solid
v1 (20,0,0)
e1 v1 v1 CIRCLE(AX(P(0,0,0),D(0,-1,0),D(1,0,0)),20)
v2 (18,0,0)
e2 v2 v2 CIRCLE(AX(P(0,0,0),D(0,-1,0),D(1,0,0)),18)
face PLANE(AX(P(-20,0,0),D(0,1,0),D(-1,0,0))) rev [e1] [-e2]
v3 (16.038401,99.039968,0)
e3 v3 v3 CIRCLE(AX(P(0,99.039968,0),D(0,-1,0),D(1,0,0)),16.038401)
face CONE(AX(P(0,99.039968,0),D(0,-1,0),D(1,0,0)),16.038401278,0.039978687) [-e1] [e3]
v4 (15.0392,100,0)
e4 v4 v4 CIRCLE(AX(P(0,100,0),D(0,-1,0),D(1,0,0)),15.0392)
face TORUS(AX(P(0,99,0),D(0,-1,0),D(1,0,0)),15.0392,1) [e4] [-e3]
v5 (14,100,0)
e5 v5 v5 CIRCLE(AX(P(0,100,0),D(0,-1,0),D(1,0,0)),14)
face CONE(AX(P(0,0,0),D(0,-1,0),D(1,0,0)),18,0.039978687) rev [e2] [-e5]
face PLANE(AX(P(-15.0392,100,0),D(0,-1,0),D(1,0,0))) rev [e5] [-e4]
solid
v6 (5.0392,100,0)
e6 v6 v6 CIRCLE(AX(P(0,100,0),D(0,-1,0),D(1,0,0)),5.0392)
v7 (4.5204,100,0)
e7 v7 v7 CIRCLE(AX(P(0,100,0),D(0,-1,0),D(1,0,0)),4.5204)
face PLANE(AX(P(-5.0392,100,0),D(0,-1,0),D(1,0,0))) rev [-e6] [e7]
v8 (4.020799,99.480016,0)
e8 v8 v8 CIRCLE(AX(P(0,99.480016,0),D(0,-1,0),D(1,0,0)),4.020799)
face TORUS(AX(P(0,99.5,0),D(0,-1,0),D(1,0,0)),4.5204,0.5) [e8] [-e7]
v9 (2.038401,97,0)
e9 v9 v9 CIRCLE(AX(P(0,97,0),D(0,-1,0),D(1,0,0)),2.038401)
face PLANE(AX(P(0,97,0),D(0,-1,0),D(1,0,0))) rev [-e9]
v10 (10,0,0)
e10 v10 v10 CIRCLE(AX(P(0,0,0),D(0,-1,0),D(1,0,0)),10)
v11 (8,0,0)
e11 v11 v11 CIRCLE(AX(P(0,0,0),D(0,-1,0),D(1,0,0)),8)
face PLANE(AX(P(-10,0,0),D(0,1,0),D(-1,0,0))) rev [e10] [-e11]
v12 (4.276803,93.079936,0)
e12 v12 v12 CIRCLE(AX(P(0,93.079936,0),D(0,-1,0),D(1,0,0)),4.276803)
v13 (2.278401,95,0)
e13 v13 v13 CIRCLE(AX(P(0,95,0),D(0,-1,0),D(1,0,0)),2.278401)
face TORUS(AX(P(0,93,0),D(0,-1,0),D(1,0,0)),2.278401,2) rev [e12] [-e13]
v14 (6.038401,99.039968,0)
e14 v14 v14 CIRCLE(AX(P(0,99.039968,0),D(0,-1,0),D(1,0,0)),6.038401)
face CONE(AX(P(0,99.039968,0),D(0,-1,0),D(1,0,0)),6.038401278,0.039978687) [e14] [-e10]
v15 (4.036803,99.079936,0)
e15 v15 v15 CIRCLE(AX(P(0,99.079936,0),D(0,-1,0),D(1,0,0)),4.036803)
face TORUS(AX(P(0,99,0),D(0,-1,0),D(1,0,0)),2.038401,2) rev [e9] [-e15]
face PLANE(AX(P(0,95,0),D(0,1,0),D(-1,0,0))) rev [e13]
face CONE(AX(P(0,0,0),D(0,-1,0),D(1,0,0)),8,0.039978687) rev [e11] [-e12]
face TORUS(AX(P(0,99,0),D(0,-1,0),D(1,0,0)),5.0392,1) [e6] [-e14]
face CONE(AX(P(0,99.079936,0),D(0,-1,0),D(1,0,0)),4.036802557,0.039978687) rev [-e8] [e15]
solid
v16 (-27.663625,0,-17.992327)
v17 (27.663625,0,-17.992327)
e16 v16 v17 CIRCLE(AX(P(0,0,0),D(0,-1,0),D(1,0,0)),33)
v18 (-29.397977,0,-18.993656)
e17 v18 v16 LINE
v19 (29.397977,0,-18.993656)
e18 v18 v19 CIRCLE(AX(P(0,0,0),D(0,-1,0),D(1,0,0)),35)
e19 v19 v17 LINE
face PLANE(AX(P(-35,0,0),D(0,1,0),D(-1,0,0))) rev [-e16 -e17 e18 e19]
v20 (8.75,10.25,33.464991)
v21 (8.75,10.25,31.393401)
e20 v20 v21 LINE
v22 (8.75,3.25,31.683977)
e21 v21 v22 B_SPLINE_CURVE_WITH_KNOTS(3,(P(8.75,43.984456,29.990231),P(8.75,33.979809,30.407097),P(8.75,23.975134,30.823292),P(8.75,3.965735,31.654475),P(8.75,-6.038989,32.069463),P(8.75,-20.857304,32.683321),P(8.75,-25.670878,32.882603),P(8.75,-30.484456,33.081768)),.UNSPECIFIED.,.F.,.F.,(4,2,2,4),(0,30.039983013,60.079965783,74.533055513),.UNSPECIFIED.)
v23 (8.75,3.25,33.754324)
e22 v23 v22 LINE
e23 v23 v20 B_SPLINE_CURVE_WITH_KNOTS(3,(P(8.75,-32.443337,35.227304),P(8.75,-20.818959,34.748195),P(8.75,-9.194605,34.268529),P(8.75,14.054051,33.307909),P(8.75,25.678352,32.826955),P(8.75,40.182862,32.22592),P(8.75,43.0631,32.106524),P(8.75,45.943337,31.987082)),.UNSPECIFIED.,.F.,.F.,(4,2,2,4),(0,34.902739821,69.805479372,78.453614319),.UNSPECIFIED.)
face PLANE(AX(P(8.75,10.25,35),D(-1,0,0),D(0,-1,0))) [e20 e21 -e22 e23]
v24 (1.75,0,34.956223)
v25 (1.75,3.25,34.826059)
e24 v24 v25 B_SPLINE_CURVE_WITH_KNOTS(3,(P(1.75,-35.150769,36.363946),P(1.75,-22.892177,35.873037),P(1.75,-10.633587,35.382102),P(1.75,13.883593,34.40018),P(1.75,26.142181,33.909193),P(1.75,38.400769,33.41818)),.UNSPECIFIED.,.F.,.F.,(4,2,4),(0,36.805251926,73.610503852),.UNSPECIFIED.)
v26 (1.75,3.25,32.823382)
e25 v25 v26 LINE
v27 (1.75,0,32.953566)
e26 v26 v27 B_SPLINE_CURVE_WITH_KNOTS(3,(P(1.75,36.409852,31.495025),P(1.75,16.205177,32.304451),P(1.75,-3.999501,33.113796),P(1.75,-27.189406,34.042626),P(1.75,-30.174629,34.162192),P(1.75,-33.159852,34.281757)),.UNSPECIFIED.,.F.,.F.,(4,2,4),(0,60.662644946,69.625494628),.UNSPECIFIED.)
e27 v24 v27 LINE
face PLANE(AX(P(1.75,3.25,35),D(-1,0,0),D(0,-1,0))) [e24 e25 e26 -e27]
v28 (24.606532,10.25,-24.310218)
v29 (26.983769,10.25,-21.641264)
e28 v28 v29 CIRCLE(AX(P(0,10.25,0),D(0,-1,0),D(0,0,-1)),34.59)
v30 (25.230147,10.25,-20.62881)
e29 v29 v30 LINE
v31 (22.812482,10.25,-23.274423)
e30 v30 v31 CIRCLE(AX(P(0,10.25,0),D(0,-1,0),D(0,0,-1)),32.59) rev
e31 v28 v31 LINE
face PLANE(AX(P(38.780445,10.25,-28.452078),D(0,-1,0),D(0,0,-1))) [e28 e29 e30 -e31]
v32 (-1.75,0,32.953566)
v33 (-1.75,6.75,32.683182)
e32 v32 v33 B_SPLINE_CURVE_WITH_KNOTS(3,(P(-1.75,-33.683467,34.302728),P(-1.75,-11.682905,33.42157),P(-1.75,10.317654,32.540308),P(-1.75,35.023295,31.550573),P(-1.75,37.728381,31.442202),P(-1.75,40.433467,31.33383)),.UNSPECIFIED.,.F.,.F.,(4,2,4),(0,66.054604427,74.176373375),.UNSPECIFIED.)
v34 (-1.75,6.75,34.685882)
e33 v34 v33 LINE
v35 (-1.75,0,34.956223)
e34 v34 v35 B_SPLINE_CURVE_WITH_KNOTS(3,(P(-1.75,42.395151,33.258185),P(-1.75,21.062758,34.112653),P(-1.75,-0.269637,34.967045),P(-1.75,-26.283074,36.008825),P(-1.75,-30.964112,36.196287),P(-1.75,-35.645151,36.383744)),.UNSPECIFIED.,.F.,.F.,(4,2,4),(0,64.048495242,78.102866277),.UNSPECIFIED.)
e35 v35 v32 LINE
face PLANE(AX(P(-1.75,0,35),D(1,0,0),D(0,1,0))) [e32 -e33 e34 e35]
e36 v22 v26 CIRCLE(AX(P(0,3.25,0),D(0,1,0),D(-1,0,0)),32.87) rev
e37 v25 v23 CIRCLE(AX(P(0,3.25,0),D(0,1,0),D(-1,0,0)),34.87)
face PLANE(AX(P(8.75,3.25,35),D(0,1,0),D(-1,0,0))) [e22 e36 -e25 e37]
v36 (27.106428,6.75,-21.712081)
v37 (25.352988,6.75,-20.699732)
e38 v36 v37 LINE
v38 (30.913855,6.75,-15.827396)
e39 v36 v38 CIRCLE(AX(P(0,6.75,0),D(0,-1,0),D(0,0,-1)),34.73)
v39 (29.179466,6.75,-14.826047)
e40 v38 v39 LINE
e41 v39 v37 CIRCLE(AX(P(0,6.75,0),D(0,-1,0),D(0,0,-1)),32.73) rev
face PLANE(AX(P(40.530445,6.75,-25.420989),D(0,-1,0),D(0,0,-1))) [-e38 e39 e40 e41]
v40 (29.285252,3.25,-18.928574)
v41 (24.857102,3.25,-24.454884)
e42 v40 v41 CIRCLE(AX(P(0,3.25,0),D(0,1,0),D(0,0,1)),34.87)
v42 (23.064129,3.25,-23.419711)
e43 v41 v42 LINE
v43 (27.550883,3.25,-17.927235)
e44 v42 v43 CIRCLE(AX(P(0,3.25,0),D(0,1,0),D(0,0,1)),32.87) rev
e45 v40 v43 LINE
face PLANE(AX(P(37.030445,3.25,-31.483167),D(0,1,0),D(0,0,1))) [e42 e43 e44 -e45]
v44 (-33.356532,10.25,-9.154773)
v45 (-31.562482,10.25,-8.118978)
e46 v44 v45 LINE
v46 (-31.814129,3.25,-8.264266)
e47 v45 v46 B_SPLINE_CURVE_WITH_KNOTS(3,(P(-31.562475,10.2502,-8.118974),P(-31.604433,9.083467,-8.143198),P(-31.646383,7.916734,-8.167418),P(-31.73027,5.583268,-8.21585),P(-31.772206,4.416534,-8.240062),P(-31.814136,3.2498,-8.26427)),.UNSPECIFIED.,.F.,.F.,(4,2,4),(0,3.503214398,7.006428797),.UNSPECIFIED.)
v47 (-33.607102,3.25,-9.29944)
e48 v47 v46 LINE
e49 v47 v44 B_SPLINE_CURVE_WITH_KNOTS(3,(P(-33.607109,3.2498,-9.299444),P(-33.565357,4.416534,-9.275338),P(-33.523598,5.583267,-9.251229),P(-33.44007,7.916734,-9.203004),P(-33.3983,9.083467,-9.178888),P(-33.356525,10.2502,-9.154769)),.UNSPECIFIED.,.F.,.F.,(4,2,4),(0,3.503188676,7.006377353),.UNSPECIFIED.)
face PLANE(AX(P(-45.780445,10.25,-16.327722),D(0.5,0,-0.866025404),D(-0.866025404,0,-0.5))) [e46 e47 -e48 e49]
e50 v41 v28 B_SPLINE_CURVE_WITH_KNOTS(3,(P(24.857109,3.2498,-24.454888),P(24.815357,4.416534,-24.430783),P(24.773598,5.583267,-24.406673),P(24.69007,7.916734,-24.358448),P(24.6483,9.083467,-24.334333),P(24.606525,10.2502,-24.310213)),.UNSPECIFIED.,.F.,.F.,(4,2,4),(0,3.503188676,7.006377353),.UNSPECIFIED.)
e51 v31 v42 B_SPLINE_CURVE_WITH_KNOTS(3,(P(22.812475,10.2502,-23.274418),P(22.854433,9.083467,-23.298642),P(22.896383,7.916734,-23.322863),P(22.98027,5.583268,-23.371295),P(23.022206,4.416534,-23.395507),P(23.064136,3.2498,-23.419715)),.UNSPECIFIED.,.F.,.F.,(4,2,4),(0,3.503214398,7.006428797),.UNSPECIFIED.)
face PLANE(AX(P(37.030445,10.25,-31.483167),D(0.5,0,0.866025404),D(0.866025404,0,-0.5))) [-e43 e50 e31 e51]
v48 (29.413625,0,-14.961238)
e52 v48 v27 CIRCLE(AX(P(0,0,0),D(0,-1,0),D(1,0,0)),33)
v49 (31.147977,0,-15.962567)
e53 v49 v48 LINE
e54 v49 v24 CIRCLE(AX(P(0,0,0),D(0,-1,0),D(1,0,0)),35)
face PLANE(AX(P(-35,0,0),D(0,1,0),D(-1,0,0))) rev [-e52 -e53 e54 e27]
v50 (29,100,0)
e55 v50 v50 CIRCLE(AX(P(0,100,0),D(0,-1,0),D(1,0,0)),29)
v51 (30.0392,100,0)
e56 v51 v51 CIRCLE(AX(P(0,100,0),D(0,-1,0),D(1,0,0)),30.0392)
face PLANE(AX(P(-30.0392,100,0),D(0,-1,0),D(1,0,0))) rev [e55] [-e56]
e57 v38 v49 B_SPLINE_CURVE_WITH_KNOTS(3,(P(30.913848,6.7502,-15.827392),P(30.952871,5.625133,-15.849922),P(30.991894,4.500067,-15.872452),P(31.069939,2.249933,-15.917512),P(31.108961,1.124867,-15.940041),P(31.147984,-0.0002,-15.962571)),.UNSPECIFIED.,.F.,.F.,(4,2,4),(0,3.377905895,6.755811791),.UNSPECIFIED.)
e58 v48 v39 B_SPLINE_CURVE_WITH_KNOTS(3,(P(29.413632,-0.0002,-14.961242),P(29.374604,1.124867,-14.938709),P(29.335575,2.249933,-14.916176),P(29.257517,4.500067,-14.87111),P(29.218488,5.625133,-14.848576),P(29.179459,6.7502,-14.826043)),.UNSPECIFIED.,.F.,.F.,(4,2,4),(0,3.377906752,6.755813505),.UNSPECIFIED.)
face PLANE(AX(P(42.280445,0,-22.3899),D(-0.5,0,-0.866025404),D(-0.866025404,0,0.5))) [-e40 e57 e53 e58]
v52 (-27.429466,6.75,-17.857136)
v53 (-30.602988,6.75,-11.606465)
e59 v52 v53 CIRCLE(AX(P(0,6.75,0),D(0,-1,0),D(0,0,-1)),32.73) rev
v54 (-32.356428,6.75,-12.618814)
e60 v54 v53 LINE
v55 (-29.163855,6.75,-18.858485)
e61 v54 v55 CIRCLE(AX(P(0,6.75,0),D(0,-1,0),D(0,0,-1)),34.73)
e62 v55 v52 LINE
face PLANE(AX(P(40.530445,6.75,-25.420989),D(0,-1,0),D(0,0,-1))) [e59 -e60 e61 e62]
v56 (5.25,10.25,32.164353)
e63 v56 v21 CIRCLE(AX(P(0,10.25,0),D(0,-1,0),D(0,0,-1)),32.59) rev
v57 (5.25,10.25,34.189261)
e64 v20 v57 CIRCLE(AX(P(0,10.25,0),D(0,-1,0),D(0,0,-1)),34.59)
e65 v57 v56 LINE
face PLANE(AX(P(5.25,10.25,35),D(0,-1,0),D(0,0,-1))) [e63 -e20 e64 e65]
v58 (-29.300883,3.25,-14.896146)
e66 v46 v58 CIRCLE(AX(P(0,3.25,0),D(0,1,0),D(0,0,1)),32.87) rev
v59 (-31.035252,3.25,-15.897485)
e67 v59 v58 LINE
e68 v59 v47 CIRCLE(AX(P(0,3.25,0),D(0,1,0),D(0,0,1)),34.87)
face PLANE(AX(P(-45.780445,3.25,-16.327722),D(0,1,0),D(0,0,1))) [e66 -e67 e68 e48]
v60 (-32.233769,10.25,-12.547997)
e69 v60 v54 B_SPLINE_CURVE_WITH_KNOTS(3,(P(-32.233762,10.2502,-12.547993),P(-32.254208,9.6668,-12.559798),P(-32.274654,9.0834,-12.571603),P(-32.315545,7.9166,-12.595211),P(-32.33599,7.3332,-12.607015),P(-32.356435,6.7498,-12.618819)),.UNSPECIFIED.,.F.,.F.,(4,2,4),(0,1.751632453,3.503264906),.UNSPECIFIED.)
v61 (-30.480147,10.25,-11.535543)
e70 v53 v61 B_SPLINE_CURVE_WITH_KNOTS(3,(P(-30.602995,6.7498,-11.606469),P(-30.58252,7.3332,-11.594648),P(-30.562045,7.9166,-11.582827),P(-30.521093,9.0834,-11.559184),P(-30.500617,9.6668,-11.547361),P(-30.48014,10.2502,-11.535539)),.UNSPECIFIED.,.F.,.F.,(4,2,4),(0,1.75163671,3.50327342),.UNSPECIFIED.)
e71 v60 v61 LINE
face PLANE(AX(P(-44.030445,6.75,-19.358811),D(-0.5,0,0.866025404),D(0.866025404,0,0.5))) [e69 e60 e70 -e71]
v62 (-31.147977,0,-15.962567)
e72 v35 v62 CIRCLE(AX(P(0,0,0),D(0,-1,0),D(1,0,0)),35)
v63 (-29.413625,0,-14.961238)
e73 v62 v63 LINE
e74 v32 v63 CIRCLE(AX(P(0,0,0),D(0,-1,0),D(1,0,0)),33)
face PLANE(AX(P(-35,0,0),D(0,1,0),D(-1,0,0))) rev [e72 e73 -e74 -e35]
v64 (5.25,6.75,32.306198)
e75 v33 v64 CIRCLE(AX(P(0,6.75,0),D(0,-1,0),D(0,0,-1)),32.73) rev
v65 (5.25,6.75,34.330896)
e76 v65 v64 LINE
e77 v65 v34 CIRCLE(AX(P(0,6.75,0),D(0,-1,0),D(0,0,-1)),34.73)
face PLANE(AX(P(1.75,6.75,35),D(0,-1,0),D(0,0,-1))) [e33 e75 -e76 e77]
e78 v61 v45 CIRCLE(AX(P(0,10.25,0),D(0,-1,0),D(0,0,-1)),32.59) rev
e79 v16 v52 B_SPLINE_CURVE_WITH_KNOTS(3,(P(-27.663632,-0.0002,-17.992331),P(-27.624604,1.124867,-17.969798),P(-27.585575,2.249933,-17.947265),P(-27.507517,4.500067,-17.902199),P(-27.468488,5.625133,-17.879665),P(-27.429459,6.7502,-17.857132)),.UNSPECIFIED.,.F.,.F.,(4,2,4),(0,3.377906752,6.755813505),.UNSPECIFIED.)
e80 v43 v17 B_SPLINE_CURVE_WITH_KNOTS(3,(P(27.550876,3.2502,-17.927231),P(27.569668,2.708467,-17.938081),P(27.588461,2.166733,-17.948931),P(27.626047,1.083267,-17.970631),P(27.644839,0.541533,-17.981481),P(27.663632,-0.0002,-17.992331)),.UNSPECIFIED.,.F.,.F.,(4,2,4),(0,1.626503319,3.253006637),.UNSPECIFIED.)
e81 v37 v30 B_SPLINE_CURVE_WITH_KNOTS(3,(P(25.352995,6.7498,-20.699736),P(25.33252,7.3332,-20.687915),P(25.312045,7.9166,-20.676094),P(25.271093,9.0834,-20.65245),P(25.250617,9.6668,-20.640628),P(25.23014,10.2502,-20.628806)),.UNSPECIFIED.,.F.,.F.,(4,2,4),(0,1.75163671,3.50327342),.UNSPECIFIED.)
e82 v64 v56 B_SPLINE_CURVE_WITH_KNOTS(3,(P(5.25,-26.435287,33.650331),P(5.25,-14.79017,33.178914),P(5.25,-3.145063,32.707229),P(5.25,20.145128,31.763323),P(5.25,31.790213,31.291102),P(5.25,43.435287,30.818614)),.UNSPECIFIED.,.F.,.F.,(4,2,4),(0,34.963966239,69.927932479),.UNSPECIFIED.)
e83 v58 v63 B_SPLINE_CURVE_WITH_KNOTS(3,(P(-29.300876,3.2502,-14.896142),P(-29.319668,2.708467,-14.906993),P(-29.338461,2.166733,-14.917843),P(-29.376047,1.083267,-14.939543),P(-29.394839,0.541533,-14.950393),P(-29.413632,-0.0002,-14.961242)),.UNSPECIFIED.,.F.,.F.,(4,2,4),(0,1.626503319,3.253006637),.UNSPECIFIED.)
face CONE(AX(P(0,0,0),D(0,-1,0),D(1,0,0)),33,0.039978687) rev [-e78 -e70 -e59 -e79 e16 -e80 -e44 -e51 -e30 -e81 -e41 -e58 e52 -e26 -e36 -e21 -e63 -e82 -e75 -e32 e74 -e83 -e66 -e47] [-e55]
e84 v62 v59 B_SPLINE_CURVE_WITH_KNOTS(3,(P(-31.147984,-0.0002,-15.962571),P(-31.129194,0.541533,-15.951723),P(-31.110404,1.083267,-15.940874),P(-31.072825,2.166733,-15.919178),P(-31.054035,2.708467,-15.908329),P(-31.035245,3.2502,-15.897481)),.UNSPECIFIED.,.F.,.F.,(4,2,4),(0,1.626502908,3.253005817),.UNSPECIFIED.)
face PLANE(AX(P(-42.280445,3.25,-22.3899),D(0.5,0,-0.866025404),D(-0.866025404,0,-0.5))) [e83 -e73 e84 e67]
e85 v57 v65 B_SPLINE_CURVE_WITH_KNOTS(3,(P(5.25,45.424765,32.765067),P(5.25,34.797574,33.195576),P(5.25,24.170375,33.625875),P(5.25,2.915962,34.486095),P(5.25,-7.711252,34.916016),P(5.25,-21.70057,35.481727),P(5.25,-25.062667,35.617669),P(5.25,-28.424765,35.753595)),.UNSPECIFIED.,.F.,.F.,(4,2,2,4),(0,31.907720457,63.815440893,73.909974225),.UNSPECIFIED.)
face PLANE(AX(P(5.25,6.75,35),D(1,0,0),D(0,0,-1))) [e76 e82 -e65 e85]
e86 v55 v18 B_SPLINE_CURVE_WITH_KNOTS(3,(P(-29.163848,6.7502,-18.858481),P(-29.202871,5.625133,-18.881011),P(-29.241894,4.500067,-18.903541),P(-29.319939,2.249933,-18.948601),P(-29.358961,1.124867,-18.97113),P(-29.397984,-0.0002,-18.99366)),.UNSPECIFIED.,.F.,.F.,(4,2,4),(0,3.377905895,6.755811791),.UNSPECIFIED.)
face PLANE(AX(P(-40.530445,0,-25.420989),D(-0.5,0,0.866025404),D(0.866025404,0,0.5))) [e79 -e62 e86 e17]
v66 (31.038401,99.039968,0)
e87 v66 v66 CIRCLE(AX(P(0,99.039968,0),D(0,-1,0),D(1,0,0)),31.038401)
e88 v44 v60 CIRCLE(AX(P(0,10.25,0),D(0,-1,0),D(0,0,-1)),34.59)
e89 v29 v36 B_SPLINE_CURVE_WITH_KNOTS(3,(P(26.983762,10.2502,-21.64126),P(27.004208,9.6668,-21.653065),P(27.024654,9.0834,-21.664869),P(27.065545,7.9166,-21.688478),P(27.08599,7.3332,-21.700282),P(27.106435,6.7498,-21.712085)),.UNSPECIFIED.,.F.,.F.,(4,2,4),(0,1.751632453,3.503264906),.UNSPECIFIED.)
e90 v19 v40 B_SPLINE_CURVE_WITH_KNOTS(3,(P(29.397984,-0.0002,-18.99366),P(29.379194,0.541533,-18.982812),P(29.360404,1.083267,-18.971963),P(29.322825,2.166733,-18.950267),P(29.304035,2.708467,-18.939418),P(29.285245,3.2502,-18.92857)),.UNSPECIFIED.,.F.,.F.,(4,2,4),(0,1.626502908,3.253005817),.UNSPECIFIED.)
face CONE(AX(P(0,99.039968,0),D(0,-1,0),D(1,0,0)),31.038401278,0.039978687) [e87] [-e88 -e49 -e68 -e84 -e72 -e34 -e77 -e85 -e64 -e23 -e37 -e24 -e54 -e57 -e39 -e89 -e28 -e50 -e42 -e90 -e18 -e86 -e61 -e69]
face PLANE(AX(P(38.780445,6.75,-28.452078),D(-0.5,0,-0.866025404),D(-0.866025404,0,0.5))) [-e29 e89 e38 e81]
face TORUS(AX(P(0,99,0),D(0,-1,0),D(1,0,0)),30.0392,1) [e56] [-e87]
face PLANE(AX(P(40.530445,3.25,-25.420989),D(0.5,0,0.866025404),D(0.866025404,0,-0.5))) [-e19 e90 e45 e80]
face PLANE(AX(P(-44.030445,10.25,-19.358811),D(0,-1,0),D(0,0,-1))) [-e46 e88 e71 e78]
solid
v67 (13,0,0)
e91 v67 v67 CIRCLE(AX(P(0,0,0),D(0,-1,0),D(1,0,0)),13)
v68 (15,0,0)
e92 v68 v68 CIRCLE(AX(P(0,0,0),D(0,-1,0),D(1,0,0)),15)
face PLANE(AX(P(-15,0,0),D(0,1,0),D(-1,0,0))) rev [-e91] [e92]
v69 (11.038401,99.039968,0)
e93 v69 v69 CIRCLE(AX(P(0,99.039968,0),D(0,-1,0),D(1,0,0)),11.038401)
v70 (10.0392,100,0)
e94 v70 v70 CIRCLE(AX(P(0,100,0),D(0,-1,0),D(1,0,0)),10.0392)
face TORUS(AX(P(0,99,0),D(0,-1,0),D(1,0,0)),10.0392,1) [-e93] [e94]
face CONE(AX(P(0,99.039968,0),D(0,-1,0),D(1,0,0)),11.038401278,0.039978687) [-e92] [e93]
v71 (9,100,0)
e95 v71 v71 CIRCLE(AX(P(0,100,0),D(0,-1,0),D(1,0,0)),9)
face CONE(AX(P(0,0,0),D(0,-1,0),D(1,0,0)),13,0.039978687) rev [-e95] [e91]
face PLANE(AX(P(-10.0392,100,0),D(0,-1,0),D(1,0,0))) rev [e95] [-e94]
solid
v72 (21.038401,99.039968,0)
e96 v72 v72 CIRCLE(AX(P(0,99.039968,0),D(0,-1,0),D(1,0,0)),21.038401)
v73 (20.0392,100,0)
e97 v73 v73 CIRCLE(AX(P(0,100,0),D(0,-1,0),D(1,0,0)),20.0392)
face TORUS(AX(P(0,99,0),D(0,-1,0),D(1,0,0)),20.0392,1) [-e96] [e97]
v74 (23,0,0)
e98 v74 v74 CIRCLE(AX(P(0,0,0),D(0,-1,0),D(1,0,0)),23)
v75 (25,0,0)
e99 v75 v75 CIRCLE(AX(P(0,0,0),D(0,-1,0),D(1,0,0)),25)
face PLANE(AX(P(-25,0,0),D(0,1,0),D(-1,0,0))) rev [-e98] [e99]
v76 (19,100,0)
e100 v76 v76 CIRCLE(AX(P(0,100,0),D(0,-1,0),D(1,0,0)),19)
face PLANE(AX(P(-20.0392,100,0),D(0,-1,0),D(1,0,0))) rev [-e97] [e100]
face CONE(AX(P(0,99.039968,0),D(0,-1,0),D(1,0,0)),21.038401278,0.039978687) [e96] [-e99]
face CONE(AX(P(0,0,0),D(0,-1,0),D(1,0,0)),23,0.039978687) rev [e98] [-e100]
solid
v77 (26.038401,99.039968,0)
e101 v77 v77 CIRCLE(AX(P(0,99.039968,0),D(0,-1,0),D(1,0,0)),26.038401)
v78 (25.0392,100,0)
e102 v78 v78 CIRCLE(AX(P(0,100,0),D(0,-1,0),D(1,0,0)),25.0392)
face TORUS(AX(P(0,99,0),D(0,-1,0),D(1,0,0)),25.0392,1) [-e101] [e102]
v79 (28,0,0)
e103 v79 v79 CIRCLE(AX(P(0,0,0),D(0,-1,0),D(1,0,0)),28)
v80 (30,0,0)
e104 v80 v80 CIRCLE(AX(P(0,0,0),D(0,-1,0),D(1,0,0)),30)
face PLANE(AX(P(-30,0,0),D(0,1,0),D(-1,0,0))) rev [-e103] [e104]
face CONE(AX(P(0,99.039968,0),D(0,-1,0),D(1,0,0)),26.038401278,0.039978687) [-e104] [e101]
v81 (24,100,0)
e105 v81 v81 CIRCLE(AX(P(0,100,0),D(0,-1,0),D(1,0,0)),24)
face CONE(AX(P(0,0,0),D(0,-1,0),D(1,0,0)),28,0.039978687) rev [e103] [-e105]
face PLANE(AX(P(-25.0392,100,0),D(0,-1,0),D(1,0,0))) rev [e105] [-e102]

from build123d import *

# Parameters (mm, degrees)
CUT_EXTRUDE_START        = 30
CUT_EXTRUDE_2_DEPTH      = 6
PATTERN_CIRCULAR_1_COUNT = 3


with BuildPart() as part:
    # Эскиз6 → Повернуть1 (revolve)
    with BuildSketch(Plane.XY, mode=Mode.PRIVATE) as revolve_1_sk:
        with BuildLine():
            Line((-35, 0), (-31.038401278, 99.039968038))
            ThreePointArc((-31.038401278, 99.039968038), (-30.732032176, 99.721099174), (-30.03920032, 100))
            Line((-30.03920032, 100), (-29, 100))
            Line((-29, 100), (-33, 0))
            Line((-33, 0), (-35, 0))
        make_face()
        with BuildLine():
            Line((-24, 100), (-28, 0))
            Line((-28, 0), (-30, 0))
            Line((-30, 0), (-26.038401278, 99.039968038))
            ThreePointArc((-26.038401278, 99.039968038), (-25.732032176, 99.721099174), (-25.03920032, 100))
            Line((-25.03920032, 100), (-24, 100))
        make_face()
        with BuildLine():
            Line((-19, 100), (-23, 0))
            Line((-23, 0), (-25, 0))
            Line((-25, 0), (-21.038401278, 99.039968038))
            ThreePointArc((-21.038401278, 99.039968038), (-20.732032176, 99.721099174), (-20.03920032, 100))
            Line((-20.03920032, 100), (-19, 100))
        make_face()
        with BuildLine():
            Line((-14, 100), (-18, 0))
            Line((-18, 0), (-20, 0))
            Line((-20, 0), (-16.038401278, 99.039968038))
            ThreePointArc((-16.038401278, 99.039968038), (-15.732032176, 99.721099174), (-15.03920032, 100))
            Line((-15.03920032, 100), (-14, 100))
        make_face()
        with BuildLine():
            Line((-9, 100), (-13, 0))
            Line((-13, 0), (-15, 0))
            Line((-15, 0), (-11.038401278, 99.039968038))
            ThreePointArc((-11.038401278, 99.039968038), (-10.732032176, 99.721099174), (-10.03920032, 100))
            Line((-10.03920032, 100), (-9, 100))
        make_face()
        with BuildLine():
            Line((-4.020799361, 99.480015981), (-4.036802557, 99.079936077))
            ThreePointArc((-4.036802557, 99.079936077), (-3.480598988, 97.614336288), (-2.038400639, 97))
            Line((-2.038400639, 97), (0, 97))
            Line((0, 97), (0, 95))
            Line((0, 95), (-2.278400639, 95))
            ThreePointArc((-2.278400639, 95), (-3.664064352, 94.442198349), (-4.276802557, 93.079936077))
            Line((-4.276802557, 93.079936077), (-8, 0))
            Line((-8, 0), (-10, 0))
            Line((-10, 0), (-6.038401278, 99.039968038))
            ThreePointArc((-6.038401278, 99.039968038), (-5.732032176, 99.721099174), (-5.03920032, 100))
            Line((-5.03920032, 100), (-4.52039984, 100))
            ThreePointArc((-4.52039984, 100), (-4.159850253, 99.846415928), (-4.020799361, 99.480015981))
        make_face()
    revolve(revolve_1_sk.sketch.rotate(Axis((0, 0, 0), (0, 1, 0)), 180), axis=Axis((0, 0, 0), (0, 1, 0)))

    # Вырез-Вытянуть2: read off the stored shape, not the designer's step
    # Вырез-Вытянуть2 outline → Вырез-Вытянуть2 (cut)
    with BuildSketch(Plane.XY.offset(CUT_EXTRUDE_START)):
        Polygon((1.75, 0), (1.75, 3.25), (8.75, 3.25), (8.75, 10.25), (5.25, 10.25), (5.25, 6.75), (-1.75, 6.75), (-1.75, 0), align=None)
    cut_extrude_2 = extrude(amount=CUT_EXTRUDE_2_DEPTH, mode=Mode.SUBTRACT)

    # Круговой массив1: Вырез-Вытянуть2 ×3 about axis
    pattern_circular_1_axis = Axis((0, 0, 0), (0, 1, 0))
    for i in range(1, PATTERN_CIRCULAR_1_COUNT):
        add(cut_extrude_2.rotate(pattern_circular_1_axis, i * 360 / PATTERN_CIRCULAR_1_COUNT), mode=Mode.SUBTRACT)


solid = part.part
